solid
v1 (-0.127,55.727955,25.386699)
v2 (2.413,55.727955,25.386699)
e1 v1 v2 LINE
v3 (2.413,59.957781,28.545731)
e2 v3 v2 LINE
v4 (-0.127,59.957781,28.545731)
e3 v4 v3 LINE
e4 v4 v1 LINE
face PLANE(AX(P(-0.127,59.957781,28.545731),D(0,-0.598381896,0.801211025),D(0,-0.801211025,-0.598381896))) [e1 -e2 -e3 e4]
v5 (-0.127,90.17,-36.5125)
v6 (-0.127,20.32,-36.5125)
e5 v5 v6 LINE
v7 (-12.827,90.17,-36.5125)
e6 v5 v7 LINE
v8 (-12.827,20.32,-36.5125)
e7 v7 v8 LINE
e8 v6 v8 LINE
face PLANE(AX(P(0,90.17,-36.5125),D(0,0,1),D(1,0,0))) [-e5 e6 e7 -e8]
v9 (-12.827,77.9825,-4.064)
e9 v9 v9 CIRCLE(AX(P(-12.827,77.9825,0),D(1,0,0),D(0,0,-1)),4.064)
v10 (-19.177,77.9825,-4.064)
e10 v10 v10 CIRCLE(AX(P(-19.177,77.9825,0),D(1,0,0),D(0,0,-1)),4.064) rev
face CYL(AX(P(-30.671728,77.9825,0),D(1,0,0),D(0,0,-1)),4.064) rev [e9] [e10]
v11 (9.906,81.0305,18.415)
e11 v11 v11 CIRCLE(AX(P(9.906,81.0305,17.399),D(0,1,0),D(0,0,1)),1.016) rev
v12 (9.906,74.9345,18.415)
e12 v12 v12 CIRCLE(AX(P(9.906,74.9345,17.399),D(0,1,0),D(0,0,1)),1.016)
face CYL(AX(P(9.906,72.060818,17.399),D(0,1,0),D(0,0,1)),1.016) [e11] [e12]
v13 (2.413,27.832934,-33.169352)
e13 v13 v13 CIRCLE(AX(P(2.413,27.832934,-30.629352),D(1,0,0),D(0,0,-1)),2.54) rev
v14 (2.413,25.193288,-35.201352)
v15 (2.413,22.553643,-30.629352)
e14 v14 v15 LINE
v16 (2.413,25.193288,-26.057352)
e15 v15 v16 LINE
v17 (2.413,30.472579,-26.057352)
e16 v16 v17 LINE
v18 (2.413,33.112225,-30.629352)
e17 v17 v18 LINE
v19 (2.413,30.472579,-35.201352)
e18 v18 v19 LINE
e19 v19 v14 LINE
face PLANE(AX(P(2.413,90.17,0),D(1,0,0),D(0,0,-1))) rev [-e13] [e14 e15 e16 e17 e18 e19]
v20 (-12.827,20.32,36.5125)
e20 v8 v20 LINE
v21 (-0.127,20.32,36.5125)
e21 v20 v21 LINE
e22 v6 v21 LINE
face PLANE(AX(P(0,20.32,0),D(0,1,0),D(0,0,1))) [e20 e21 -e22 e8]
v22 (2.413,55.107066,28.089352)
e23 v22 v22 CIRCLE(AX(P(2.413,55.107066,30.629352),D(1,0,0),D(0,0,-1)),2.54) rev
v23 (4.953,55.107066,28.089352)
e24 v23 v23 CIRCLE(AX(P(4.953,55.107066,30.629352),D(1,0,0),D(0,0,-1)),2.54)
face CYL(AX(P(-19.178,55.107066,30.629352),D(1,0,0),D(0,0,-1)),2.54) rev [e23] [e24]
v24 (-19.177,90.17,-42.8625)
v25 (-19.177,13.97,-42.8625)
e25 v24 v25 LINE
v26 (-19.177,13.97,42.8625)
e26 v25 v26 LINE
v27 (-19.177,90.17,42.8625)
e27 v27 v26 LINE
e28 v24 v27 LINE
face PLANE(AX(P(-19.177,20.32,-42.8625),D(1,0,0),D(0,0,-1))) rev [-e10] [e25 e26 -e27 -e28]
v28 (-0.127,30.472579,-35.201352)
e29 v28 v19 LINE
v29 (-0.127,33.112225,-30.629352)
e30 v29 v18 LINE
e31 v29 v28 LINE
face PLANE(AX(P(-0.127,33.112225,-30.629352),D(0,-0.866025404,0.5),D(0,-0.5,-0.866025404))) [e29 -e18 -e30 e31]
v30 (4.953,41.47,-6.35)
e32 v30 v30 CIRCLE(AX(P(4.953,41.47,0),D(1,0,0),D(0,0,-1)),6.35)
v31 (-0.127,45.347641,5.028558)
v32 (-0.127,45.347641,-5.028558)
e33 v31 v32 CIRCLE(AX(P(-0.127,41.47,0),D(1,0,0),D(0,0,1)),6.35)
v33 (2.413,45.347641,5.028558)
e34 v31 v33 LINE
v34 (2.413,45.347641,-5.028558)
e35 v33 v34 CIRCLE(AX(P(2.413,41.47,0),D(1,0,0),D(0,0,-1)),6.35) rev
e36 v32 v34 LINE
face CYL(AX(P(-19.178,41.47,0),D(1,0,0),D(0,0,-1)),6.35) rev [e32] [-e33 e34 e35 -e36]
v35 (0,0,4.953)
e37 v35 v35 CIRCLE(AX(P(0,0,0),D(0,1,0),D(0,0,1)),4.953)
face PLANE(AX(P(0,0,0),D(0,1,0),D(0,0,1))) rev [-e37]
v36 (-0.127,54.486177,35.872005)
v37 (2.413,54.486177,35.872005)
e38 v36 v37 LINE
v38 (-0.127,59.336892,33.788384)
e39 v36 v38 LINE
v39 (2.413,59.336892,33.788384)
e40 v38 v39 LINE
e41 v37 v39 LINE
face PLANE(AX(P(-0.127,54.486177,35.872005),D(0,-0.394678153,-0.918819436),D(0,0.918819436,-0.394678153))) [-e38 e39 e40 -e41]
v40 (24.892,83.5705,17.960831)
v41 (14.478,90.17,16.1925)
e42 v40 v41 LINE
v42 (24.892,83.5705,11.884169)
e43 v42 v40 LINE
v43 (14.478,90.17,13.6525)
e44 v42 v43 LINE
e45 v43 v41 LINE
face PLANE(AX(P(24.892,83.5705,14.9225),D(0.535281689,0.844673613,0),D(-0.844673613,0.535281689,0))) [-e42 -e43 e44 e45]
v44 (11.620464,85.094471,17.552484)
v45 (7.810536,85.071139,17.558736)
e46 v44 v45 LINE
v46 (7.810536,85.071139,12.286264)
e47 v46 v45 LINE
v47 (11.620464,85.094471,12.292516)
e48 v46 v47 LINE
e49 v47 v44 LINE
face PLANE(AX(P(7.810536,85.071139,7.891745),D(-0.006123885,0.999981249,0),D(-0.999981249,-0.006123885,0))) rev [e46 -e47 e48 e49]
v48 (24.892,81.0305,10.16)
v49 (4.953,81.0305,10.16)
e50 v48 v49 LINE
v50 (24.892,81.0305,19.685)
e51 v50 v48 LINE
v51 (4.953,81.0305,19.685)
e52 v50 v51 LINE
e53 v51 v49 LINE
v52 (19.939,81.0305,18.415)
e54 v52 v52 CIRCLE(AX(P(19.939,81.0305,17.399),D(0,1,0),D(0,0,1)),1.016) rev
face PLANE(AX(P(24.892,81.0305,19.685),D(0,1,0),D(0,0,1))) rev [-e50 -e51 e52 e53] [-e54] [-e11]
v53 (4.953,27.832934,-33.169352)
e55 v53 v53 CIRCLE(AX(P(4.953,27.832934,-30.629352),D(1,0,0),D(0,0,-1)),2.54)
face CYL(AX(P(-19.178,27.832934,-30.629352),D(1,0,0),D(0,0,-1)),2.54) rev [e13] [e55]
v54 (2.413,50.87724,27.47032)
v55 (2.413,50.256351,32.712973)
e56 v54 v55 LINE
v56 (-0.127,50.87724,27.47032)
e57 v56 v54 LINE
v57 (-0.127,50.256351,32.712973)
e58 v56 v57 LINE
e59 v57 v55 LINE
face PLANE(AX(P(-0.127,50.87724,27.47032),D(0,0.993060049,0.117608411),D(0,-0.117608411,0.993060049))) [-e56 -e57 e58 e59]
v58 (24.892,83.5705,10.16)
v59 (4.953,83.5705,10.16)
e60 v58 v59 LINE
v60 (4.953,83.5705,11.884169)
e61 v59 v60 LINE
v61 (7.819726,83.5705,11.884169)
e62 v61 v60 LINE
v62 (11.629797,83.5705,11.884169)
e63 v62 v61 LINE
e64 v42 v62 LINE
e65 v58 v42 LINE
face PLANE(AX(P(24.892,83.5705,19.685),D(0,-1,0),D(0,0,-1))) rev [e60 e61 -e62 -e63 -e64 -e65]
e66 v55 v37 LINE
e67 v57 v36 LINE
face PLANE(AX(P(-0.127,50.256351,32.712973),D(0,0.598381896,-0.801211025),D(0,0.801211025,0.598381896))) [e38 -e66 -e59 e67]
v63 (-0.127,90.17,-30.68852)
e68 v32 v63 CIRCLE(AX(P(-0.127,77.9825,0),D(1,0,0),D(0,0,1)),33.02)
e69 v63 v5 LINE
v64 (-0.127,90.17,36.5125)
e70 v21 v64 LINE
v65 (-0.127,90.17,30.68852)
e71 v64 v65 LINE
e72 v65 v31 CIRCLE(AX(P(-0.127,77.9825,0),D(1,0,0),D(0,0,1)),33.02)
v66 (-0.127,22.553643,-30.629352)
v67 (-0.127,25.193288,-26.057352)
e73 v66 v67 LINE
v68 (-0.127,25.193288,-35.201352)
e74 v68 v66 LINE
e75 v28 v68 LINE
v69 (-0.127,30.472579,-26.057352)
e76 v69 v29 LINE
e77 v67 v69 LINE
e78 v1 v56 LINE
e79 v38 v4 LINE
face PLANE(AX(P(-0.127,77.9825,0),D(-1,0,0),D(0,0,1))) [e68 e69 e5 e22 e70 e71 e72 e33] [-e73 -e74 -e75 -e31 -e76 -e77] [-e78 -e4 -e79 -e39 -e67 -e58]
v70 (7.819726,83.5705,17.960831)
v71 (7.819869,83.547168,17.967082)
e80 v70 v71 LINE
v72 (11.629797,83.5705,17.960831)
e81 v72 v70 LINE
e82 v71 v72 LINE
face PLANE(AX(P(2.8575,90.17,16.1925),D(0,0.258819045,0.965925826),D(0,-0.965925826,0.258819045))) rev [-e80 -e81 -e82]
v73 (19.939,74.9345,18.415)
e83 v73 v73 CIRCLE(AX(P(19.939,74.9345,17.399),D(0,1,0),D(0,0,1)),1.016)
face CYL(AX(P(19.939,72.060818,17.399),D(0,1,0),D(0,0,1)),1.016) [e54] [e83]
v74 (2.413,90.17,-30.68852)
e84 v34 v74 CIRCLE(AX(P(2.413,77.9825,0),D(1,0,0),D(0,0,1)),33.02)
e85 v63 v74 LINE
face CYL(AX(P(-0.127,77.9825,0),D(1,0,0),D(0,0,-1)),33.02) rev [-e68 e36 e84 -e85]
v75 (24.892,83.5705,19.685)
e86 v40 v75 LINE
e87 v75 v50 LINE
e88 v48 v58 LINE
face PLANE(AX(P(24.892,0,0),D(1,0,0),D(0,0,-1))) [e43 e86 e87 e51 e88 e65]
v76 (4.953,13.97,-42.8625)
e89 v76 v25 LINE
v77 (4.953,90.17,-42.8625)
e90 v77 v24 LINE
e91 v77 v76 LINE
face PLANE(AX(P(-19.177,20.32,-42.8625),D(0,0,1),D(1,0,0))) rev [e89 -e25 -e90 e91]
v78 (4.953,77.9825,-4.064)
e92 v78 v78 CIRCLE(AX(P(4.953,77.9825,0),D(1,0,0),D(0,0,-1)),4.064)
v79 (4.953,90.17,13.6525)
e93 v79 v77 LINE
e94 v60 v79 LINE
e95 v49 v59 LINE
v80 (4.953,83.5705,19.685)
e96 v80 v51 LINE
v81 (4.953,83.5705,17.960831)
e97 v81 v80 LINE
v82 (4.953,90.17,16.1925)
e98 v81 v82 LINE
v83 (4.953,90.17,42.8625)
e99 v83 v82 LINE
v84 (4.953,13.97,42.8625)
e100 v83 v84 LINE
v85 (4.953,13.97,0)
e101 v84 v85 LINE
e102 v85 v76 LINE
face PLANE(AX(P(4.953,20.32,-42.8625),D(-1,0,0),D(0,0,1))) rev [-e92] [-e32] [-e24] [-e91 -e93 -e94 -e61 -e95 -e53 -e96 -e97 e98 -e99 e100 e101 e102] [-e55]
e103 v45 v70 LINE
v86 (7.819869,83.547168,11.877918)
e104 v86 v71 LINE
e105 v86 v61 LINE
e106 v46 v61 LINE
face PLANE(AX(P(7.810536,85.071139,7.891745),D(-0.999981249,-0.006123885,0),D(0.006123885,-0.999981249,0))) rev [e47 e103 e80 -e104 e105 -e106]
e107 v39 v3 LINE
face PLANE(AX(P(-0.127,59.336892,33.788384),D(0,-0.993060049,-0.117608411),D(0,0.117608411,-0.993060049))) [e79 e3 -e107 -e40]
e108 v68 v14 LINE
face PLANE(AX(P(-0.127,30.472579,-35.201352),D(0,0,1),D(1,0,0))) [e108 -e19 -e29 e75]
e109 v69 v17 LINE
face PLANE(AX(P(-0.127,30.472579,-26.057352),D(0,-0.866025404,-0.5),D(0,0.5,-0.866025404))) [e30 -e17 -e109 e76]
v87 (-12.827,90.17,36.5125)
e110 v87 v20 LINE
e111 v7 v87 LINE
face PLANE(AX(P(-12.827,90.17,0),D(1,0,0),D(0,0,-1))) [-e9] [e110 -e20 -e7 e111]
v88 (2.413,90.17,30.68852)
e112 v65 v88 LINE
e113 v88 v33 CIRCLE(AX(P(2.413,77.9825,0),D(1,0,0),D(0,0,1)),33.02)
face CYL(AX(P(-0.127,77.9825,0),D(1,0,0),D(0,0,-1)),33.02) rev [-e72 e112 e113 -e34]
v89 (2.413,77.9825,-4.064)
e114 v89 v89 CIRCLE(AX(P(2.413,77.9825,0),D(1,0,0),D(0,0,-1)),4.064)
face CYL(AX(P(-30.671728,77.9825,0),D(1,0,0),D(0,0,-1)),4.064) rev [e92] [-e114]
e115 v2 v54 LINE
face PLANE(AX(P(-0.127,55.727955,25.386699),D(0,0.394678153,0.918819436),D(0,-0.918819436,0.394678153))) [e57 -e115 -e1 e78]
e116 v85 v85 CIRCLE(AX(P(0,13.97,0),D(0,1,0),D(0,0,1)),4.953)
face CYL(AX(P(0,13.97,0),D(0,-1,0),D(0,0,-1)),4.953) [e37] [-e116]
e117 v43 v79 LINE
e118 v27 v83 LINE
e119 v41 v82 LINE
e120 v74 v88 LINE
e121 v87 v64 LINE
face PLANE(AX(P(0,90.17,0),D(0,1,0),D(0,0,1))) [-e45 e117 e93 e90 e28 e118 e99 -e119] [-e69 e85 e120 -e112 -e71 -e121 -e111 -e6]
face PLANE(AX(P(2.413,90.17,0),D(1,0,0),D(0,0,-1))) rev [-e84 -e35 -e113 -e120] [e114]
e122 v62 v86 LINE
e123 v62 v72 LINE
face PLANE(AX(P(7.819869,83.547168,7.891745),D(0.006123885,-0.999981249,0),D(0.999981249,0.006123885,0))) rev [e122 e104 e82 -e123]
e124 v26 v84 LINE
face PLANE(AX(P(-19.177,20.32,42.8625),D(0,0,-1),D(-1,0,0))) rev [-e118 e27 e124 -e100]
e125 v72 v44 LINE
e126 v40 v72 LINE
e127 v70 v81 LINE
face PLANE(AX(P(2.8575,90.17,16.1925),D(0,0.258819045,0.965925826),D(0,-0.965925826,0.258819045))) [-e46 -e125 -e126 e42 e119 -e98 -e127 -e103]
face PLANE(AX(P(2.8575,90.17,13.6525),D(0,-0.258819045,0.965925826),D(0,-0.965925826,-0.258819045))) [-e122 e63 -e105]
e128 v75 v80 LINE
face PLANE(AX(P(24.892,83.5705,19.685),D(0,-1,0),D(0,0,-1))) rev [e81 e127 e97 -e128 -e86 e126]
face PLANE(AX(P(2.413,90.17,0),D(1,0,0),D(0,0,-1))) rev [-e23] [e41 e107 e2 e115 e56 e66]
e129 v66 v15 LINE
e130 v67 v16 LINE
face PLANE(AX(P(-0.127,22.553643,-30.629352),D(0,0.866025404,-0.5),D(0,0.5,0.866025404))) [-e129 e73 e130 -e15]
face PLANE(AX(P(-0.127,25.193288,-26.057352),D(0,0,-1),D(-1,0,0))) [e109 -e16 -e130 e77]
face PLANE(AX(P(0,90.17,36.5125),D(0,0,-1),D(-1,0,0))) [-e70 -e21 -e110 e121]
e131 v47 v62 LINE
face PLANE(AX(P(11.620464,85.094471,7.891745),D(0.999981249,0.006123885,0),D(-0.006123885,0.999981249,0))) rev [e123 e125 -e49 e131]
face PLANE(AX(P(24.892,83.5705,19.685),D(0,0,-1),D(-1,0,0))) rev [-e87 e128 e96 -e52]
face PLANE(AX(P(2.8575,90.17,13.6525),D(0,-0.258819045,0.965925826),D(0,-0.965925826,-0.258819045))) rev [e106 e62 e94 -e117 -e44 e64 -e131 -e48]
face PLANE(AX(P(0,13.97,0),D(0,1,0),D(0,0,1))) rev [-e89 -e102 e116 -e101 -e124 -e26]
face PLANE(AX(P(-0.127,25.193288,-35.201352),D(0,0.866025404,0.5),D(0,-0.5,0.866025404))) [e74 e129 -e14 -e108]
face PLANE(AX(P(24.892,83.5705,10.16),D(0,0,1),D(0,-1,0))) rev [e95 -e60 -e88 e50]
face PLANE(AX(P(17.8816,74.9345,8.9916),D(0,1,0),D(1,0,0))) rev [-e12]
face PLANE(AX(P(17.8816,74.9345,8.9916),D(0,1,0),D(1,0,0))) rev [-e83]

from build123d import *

# Parameters (mm, degrees)
SKETCH3_R                      = 4.953
POST_DEPTH                     = 13.97
SKETCH4_W                      = 24.13
SKETCH4_H                      = 85.725
BASE_DEPTH                     = 6.35
SKETCH5_W                      = 24.13
SKETCH5_H                      = 85.725
SKETCH5_W_2                    = 15.24
SKETCH5_H_2                    = 73.025
CAVITY_DEPTH                   = 69.85
MOTORHOLES_REACH               = 104.714
SKETCH8_R                      = 6.35
SKETCH8_R_2                    = 2.54
POWERSCREWHOLES_REACH          = 104.714
SKETCH7_R                      = 4.064
NUT_SOCKET_DEPTH               = 2.54
SKETCH12_W                     = 9.525
SKETCH12_H                     = 2.54
LIMITSWITCHSUPPORT_DEPTH       = 19.939
SKETCH20_R                     = 1.016
BOSS_EXTRUDE3_DEPTH            = 6.096
ZIPTIECUTOUT_REACH             = 106.211
SKETCH22_W                     = 3.81
SKETCH22_H                     = 1.524
ZIPTIECUTOUT_DIRECTION_2_REACH = 106.211


with BuildPart() as part:
    # Sketch3 → Post (new body)
    with BuildSketch(Plane(origin=(0, 0, 0), x_dir=(1, 0, 0), z_dir=(0, 1, 0))):
        with Locations(Location((0, 0, 0), (0, 0, 270))):
            Circle(SKETCH3_R)
    extrude(amount=POST_DEPTH)

    # Sketch4 → Base (add)
    with BuildSketch(Plane(origin=(0, 13.97, 0), x_dir=(1, 0, 0), z_dir=(0, 1, 0))):
        with Locations((-7.112, 0)):
            Rectangle(SKETCH4_W, SKETCH4_H)
    extrude(amount=BASE_DEPTH)

    # Sketch5 → Cavity (add)
    with BuildSketch(Plane(origin=(0, 20.32, 0), x_dir=(1, 0, 0), z_dir=(0, 1, 0))):
        with Locations((-7.112, 0)):
            Rectangle(SKETCH5_W, SKETCH5_H)
        with Locations((-5.207, 0)):
            Rectangle(SKETCH5_W_2, SKETCH5_H_2, mode=Mode.SUBTRACT)
    extrude(amount=CAVITY_DEPTH)

    # Sketch8 → MotorHoles (cut, up to next)
    with BuildSketch(Plane(origin=(4.953, 0, 0), x_dir=(0, 0, -1), z_dir=(1, 0, 0)), mode=Mode.PRIVATE) as motorholes_sk1:
        with Locations((0, 41.47)):
            Circle(SKETCH8_R)
    motorholes_tool1 = extrude(motorholes_sk1.sketch, amount=-MOTORHOLES_REACH, mode=Mode.PRIVATE) & part.part
    # Sketch8 → MotorHoles (cut, up to next)
    with BuildSketch(Plane(origin=(4.953, 0, 0), x_dir=(0, 0, -1), z_dir=(1, 0, 0)), mode=Mode.PRIVATE) as motorholes_sk2:
        with Locations((-30.629352104, 55.107066169)):
            Circle(SKETCH8_R_2)
    motorholes_tool2 = extrude(motorholes_sk2.sketch, amount=-MOTORHOLES_REACH, mode=Mode.PRIVATE) & part.part
    # Sketch8 → MotorHoles (cut, up to next)
    with BuildSketch(Plane(origin=(4.953, 0, 0), x_dir=(0, 0, -1), z_dir=(1, 0, 0)), mode=Mode.PRIVATE) as motorholes_sk3:
        with Locations((30.629352104, 27.832933831)):
            Circle(SKETCH8_R_2)
    motorholes_tool3 = extrude(motorholes_sk3.sketch, amount=-MOTORHOLES_REACH, mode=Mode.PRIVATE) & part.part
    add(motorholes_tool1.solids().sort_by_distance((4.953, 41.47, 0))[0], mode=Mode.SUBTRACT)
    add(motorholes_tool2.solids().sort_by_distance((4.953, 55.107066, 30.629352))[0], mode=Mode.SUBTRACT)
    add(motorholes_tool3.solids().sort_by_distance((4.953, 27.832934, -30.629352))[0], mode=Mode.SUBTRACT)

    # PowerscrewHoles: up to this face of the body (flat: up to its plane)
    powerscrewholes_end = Plane(part.part.faces().sort_by_distance((-19.177, 52.07, 0))[0])
    # Sketch7 → PowerscrewHoles (cut, up to the picked face)
    with BuildSketch(Plane(origin=(4.953, 0, 0), x_dir=(0, 0, -1), z_dir=(1, 0, 0)), mode=Mode.PRIVATE) as powerscrewholes_sk1:
        with Locations((0, 77.9825)):
            Circle(SKETCH7_R)
    powerscrewholes_tool1 = split(extrude(powerscrewholes_sk1.sketch, amount=-POWERSCREWHOLES_REACH, mode=Mode.PRIVATE), bisect_by=powerscrewholes_end, keep=Keep.BOTH, mode=Mode.PRIVATE)
    add(powerscrewholes_tool1.solids().sort_by(Axis((4.953, 77.9825, 0), (-1, 0, 0)))[0], mode=Mode.SUBTRACT)

    # Sketch10 → Nut Socket (add)
    with BuildSketch(Plane.ZY.offset(-2.413)):
        with BuildLine():
            Line((-36.5125, 90.17), (-30.688519739, 90.17))
            ThreePointArc((-30.688519739, 90.17), (-28.656384533, 61.577256158), (-5.028558234, 45.347641304))
            ThreePointArc((-5.028558234, 45.347641304), (0, 35.12), (5.028558234, 45.347641304))
            ThreePointArc((5.028558234, 45.347641304), (28.656384533, 61.577256158), (30.688519739, 90.17))
            Line((30.688519739, 90.17), (36.5125, 90.17))
            Line((36.5125, 90.17), (36.5125, 20.32))
            Line((36.5125, 20.32), (-36.5125, 20.32))
            Line((-36.5125, 20.32), (-36.5125, 90.17))
        make_face()
        Polygon((-26.057352104, 30.472579262), (-30.629352104, 33.112224692), (-35.201352104, 30.472579262), (-35.201352104, 25.1932884), (-30.629352104, 22.553642969), (-26.057352104, 25.1932884), align=None, mode=Mode.SUBTRACT)
        Polygon((32.712972872, 50.256351119), (35.872004948, 54.486177161), (33.788384179, 59.336892211), (28.545731335, 59.957781219), (25.38669926, 55.727955177), (27.470320028, 50.877240127), align=None, mode=Mode.SUBTRACT)
    extrude(amount=NUT_SOCKET_DEPTH)

    # Sketch12 → LimitSwitchSupport (add)
    with BuildSketch(Plane(origin=(4.953, 0, 0), x_dir=(0, 0, -1), z_dir=(1, 0, 0))):
        with Locations((-14.9225, 82.3005)):
            Rectangle(SKETCH12_W, SKETCH12_H)
    extrude(amount=LIMITSWITCHSUPPORT_DEPTH)

    # Rib2: read off the stored shape, not the designer's step
    # Rib2: loft between two sections, ruled curve by curve
    rib2_from = [
        Edge.make_line((14.478, 90.17, 13.6525), (14.478, 90.17, 16.1925)),
        Edge.make_line((4.953, 90.17, 16.1925), (14.478, 90.17, 16.1925)),
        Edge.make_line((4.953, 90.17, 13.6525), (14.478, 90.17, 13.6525)),
        Edge.make_line((4.953, 90.17, 13.6525), (4.953, 90.17, 16.1925)),
    ]
    rib2_to = [
        Edge.make_line((24.892, 83.5705, 11.884169305), (24.892, 83.5705, 17.960830695)),
        Edge.make_line((4.953, 83.5705, 17.960830695), (24.892, 83.5705, 17.960830695)),
        Edge.make_line((4.953, 83.5705, 11.884169305), (24.892, 83.5705, 11.884169305)),
        Edge.make_line((4.953, 83.5705, 11.884169305), (4.953, 83.5705, 17.960830695)),
    ]
    rib2 = Solid(Shell([*[Face.make_surface_from_curves(rib2_from[k], rib2_to[k]) for k in range(4)], Face(Wire(rib2_from)), Face(Wire(rib2_to))]))
    add(rib2)

    # Sketch20 → Boss-Extrude3 (add)
    with BuildSketch(Plane.XZ.offset(-81.0305)):
        with Locations(Location((9.906, 17.399, 0), (0, 0, 90))):
            Circle(SKETCH20_R)
        with Locations(Location((19.939, 17.399, 0), (0, 0, 90))):
            Circle(SKETCH20_R)
    extrude(amount=BOSS_EXTRUDE3_DEPTH)

    # ZipTieCutout: up to this plane
    ziptiecutout_end = Plane(origin=(2.8575, 90.17, 13.6525), z_dir=(0, -0.25881904510252135, 0.9659258262890681))
    # Sketch22 → ZipTieCutout (cut, up to the surface)
    with BuildSketch(Plane(origin=(0, 7.096196959, 14.9225), x_dir=(0.9999812488409504, 0.00612388491835337, 0), z_dir=(0, 0, 1)), mode=Mode.PRIVATE) as ziptiecutout_sk1:
        with Locations((10.192898839, 77.16364952)):
            Rectangle(SKETCH22_W, SKETCH22_H)
    ziptiecutout_tool1 = split(extrude(ziptiecutout_sk1.sketch, amount=-ZIPTIECUTOUT_REACH, mode=Mode.PRIVATE), bisect_by=ziptiecutout_end, keep=Keep.BOTH, mode=Mode.PRIVATE)
    add(ziptiecutout_tool1.solids().sort_by_distance((9.720166, 84.32082, 14.9225))[0], mode=Mode.SUBTRACT)

    # ZipTieCutout direction 2: up to this plane
    ziptiecutout_direction_2_end = Plane(origin=(2.8575, 90.17, 16.1925), z_dir=(0, 0.25881904510252135, 0.9659258262890681))
    # Sketch22 → ZipTieCutout direction 2 (cut, up to the surface)
    with BuildSketch(Plane(origin=(0, 7.096196959, 14.9225), x_dir=(0.9999812488409504, 0.00612388491835337, 0), z_dir=(0, 0, 1)), mode=Mode.PRIVATE) as ziptiecutout_direction_2_sk1:
        with Locations((10.192898839, 77.16364952)):
            Rectangle(SKETCH22_W, SKETCH22_H)
    ziptiecutout_direction_2_tool1 = split(extrude(ziptiecutout_direction_2_sk1.sketch, amount=ZIPTIECUTOUT_DIRECTION_2_REACH, mode=Mode.PRIVATE), bisect_by=ziptiecutout_direction_2_end, keep=Keep.BOTH, mode=Mode.PRIVATE)
    add(ziptiecutout_direction_2_tool1.solids().sort_by_distance((9.720166, 84.32082, 14.9225))[0], mode=Mode.SUBTRACT)


solid = part.part
